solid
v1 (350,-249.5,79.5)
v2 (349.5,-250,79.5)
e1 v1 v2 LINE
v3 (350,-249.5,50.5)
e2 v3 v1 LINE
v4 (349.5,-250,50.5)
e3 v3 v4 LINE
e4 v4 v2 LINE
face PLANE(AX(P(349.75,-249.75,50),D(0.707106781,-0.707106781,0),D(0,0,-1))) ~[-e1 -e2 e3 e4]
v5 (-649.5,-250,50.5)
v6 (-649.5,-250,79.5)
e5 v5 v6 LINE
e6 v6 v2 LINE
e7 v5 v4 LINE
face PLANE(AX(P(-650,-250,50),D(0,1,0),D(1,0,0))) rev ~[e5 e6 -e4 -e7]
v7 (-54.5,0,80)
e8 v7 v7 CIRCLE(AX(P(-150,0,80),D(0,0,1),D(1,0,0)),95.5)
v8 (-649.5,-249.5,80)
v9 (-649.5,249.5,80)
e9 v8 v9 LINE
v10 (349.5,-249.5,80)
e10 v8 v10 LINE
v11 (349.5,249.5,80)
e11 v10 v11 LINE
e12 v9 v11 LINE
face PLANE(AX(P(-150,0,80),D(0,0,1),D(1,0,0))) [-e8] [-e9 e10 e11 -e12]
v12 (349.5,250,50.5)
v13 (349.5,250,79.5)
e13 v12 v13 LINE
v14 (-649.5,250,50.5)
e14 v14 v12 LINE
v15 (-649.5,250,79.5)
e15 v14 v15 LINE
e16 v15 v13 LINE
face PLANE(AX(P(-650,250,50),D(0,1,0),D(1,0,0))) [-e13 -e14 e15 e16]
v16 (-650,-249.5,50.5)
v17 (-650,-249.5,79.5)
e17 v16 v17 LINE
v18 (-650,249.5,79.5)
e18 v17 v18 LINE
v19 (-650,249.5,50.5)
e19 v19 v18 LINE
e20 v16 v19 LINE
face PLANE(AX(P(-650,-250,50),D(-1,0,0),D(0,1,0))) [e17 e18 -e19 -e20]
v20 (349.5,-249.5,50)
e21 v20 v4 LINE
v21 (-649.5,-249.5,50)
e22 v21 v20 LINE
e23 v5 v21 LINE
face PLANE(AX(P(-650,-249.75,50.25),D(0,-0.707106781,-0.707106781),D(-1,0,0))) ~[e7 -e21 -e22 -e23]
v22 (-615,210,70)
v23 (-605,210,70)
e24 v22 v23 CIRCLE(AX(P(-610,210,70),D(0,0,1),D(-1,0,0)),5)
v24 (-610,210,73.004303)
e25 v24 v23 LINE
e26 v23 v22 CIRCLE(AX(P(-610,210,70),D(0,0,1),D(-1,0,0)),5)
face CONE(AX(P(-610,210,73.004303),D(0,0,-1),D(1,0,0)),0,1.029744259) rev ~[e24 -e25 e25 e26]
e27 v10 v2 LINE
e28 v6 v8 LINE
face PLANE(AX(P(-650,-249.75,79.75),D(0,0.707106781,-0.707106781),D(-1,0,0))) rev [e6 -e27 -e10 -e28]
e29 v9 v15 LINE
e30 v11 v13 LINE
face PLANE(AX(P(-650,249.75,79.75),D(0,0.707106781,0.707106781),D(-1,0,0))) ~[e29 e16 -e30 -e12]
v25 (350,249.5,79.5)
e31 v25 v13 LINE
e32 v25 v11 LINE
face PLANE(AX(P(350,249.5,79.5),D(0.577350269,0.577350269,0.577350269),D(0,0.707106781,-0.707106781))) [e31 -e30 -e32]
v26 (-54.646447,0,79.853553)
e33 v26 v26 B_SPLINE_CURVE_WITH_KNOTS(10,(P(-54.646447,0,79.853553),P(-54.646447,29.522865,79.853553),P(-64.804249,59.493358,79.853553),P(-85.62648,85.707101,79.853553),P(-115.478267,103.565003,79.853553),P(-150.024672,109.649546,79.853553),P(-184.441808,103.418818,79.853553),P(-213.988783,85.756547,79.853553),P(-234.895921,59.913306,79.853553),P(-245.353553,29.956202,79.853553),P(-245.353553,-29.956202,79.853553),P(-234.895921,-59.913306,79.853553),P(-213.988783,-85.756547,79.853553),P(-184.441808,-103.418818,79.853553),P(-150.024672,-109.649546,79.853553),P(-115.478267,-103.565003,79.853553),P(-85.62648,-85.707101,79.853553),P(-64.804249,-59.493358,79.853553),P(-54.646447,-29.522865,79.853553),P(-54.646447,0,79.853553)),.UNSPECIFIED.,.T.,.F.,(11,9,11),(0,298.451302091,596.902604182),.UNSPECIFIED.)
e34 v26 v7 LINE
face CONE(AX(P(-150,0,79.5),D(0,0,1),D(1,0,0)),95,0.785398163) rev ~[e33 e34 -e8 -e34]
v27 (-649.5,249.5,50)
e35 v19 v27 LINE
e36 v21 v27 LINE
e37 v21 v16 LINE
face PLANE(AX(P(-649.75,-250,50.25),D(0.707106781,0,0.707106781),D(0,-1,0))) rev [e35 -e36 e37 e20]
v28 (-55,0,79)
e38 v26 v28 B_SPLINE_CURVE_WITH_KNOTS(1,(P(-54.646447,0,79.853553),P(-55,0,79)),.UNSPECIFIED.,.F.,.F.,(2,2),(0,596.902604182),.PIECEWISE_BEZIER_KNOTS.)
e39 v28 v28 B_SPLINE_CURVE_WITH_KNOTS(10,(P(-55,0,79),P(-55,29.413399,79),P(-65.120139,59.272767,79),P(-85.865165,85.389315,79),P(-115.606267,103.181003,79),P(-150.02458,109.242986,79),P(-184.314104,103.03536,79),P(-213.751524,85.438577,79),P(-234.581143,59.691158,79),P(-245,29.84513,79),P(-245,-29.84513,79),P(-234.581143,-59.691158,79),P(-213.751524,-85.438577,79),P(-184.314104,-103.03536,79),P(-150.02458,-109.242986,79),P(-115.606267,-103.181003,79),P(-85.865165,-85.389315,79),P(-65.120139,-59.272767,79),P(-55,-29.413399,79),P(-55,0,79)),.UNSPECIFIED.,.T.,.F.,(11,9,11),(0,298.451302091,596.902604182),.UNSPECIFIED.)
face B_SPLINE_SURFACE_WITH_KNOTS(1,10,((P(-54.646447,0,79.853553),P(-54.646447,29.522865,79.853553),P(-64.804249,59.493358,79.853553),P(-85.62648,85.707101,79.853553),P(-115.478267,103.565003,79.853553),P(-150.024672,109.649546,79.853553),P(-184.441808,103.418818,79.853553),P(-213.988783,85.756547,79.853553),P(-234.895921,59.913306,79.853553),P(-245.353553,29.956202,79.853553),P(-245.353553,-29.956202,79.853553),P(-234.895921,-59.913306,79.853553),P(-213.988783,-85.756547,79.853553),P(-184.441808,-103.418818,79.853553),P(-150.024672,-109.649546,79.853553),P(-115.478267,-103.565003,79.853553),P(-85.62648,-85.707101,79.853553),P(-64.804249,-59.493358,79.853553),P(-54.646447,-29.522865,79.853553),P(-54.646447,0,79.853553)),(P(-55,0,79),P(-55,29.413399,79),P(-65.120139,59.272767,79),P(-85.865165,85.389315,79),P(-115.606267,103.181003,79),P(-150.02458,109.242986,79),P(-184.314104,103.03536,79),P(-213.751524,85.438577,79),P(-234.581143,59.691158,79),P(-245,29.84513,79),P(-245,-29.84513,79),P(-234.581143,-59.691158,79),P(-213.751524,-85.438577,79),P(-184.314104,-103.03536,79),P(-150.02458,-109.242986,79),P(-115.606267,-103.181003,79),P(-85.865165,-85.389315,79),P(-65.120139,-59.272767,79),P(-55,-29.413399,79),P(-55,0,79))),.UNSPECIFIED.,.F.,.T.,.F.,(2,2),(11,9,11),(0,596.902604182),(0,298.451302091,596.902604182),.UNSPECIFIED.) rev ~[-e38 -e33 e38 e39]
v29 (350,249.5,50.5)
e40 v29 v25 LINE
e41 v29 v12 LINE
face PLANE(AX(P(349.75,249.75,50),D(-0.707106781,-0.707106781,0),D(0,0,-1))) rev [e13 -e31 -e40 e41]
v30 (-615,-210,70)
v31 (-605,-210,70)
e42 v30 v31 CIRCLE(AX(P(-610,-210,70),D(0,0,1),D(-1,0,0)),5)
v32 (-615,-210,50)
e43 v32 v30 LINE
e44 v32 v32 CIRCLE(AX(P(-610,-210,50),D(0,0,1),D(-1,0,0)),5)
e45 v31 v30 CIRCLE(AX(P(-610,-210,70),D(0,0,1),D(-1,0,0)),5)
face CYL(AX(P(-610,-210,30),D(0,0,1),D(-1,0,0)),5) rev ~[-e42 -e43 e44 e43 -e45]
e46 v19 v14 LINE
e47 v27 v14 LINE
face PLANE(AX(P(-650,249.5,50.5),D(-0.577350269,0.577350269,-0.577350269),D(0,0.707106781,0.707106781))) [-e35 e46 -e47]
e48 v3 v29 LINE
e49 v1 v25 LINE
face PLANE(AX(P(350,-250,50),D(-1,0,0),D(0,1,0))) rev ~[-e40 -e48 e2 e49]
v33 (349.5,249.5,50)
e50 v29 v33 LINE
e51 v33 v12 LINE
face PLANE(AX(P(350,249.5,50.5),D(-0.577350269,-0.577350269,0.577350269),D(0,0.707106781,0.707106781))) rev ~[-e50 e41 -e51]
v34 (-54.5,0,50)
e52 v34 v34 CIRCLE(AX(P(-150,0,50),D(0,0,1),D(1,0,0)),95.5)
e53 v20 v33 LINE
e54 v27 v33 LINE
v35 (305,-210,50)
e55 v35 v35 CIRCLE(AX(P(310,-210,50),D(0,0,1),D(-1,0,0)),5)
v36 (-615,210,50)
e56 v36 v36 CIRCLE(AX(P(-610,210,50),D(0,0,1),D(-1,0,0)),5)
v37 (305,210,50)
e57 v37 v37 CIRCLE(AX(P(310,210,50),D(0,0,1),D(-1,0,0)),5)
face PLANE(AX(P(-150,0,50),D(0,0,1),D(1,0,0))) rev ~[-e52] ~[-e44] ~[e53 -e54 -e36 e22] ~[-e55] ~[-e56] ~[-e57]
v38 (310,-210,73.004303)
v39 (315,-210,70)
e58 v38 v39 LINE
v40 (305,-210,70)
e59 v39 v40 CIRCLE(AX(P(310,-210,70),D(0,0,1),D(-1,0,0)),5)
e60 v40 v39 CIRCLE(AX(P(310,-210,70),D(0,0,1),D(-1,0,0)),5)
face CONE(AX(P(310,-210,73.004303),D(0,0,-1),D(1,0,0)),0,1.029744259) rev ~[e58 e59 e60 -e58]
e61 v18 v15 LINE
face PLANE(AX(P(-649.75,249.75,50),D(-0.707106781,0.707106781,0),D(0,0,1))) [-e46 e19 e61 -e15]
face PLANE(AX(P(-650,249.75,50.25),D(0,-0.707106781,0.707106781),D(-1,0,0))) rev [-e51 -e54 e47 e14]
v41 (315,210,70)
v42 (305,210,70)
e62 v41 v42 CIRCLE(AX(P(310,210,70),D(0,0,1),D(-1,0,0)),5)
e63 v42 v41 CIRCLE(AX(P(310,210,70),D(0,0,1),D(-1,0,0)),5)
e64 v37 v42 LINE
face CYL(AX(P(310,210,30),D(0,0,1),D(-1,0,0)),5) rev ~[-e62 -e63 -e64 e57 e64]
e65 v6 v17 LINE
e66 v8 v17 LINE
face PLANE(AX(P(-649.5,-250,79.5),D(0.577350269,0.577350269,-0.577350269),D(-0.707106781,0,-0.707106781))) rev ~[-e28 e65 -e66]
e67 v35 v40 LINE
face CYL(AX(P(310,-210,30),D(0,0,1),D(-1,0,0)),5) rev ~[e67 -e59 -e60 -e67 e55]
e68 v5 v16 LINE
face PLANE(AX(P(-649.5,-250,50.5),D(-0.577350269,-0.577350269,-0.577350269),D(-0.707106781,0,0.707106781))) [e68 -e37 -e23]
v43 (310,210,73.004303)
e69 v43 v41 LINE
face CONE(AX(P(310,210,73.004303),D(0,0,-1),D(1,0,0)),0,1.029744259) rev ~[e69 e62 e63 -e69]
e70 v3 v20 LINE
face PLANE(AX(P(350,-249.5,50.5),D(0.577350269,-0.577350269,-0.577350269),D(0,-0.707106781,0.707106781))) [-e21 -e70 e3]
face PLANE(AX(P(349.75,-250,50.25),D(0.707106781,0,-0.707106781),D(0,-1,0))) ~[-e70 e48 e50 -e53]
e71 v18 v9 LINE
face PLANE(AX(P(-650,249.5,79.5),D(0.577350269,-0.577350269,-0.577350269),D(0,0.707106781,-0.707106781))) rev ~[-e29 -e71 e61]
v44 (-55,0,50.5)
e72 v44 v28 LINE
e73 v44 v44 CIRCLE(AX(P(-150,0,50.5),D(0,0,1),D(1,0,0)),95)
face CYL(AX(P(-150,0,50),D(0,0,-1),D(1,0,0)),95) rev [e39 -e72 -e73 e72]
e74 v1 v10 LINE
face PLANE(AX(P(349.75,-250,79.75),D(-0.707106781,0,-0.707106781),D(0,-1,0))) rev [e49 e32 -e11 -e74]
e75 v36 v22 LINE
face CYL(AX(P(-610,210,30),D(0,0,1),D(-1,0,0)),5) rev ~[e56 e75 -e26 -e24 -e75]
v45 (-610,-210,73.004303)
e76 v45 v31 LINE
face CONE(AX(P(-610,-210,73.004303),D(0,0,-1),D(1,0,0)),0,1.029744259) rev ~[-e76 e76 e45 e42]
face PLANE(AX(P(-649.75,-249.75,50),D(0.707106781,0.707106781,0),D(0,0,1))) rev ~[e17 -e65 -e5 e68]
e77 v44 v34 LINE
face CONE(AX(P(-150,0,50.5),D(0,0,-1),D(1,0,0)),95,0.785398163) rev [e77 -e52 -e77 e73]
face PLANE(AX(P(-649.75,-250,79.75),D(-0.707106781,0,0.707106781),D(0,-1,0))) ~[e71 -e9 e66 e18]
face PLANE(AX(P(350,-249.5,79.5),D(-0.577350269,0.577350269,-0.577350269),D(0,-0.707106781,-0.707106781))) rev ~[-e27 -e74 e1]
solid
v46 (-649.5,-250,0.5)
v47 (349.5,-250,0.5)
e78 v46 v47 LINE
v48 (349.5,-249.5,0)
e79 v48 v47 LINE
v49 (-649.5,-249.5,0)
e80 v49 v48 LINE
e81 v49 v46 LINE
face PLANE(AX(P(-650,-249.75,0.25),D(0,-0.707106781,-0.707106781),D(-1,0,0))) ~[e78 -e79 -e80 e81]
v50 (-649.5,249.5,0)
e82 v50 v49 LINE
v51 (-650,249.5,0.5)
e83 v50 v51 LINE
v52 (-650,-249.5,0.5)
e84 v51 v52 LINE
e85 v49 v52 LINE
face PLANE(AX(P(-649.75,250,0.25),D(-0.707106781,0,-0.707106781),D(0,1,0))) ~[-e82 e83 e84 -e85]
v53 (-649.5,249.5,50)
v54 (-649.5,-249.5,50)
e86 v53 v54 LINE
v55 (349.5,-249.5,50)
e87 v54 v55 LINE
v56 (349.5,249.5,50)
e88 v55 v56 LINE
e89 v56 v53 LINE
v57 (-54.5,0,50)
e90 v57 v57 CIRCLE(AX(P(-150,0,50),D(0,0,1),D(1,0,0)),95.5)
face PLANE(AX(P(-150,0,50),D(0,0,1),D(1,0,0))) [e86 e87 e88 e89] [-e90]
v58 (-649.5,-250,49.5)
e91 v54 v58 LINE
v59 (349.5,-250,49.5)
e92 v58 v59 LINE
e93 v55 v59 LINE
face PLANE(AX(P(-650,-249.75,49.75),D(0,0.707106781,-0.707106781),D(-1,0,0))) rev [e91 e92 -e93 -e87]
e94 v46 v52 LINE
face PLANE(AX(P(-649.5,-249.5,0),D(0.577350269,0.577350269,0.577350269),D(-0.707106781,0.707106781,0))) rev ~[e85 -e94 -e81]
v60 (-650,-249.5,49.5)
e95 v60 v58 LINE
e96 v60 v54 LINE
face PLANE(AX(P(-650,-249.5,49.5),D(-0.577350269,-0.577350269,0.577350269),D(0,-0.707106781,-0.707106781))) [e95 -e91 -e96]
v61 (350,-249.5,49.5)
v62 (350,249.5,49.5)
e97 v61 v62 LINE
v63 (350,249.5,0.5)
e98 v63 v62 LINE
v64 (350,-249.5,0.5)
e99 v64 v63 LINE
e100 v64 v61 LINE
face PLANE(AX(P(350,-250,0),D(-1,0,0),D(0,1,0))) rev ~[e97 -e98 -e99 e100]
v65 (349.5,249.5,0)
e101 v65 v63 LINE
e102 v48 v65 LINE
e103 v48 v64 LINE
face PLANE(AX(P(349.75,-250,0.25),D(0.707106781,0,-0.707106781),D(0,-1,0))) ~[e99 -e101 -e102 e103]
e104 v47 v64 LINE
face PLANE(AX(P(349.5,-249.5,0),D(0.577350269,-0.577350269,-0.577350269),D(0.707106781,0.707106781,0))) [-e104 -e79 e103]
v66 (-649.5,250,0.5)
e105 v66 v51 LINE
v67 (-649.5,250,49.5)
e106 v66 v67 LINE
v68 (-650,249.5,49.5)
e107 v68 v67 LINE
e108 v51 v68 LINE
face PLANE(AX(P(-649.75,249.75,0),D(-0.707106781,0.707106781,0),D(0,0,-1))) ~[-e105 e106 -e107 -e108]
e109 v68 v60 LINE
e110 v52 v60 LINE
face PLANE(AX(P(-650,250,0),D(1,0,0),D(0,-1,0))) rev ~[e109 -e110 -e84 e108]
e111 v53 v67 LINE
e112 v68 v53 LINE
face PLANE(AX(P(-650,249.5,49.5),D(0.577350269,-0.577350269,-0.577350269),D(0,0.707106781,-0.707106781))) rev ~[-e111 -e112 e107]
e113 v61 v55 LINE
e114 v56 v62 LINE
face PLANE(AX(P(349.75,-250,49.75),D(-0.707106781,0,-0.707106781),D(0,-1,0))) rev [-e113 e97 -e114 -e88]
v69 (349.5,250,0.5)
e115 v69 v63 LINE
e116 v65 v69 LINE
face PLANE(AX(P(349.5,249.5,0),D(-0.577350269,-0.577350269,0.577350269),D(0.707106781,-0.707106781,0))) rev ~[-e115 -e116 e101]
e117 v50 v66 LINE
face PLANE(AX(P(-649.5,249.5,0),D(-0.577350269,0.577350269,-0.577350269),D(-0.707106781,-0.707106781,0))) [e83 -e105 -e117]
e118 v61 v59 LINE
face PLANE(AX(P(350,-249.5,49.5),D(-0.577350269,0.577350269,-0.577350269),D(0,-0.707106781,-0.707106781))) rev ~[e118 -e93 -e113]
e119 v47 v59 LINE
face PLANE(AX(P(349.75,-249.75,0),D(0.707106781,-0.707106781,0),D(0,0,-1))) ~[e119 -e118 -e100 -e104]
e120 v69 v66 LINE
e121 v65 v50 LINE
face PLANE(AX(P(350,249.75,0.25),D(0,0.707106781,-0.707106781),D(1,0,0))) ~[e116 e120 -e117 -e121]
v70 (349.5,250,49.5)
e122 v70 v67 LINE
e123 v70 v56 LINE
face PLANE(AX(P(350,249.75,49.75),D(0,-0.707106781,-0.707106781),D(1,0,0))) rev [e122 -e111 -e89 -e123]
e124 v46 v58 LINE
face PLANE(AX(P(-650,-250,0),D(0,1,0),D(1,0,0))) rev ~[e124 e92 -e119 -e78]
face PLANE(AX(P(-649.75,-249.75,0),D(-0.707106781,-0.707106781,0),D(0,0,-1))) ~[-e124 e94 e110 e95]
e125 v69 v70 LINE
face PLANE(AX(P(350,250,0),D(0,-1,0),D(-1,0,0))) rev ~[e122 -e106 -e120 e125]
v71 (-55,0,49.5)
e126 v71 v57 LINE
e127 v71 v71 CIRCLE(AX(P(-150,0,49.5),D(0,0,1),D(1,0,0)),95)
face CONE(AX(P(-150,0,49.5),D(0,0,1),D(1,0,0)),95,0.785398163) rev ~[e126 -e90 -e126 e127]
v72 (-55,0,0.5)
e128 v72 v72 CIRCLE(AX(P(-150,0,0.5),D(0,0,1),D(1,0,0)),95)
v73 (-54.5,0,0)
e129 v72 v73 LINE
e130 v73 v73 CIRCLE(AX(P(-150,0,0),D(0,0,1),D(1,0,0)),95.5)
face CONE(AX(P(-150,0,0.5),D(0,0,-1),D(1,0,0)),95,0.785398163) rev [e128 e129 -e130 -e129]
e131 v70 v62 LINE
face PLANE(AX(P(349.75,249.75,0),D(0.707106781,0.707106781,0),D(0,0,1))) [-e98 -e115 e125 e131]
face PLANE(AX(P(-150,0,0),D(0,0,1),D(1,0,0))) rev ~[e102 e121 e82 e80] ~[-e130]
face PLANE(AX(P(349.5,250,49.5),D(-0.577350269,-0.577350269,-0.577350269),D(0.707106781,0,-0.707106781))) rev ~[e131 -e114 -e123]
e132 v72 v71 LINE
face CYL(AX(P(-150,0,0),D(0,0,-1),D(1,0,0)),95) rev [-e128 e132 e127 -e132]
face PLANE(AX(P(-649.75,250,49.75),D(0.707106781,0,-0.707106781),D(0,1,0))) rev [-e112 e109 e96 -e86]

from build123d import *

# Parameters (mm, degrees)
F0_R      = 95
F1_DEPTH  = 50
F3_W      = 1000
F3_H      = 500
F3_W_2    = 920
F3_H_2    = 420
F3_R      = 95
F4_DEPTH  = 30
F5_SIZE   = 0.5
F6_D      = 10
F6_DEPTH  = 20
F6_TIP    = 3.0043030951
F7_SIZE   = 0.5
F7_2_SIZE = 0.5


# Not quite as in the source:
# - a feature names something its author has since deleted; it is built from what else it names


with BuildPart() as f1:
    # F0 (on Top) → F1 (new body)
    with BuildSketch(Plane.XY):
        with BuildLine():
            Line((330, 75), (350, 75))
            Line((350, 75), (350, 250))
            Line((350, 250), (-650, 250))
            Line((-650, 250), (-650, 75))
            Line((-650, 75), (-630, 75))
            ThreePointArc((-630, 75), (-622.9289321881, 72.0710678119), (-620, 65))
            Line((-620, 65), (-620, 0))
            Line((-620, 0), (-620, -65))
            ThreePointArc((-620, -65), (-622.9289321881, -72.0710678119), (-630, -75))
            Line((-630, -75), (-650, -75))
            Line((-650, -75), (-650, -250))
            Line((-650, -250), (350, -250))
            Line((350, -250), (350, -75))
            Line((350, -75), (330, -75))
            ThreePointArc((330, -75), (322.9289321881, -72.0710678119), (320, -65))
            Line((320, -65), (320, 65))
            ThreePointArc((320, 65), (322.9289321881, 72.0710678119), (330, 75))
        make_face()
        with Locations((-150, 0)):
            Circle(F0_R, mode=Mode.SUBTRACT)
        with BuildLine():
            Line((350, -75), (350, 75))
            Line((350, 75), (330, 75))
            ThreePointArc((330, 75), (322.9289321881, 72.0710678119), (320, 65))
            Line((320, 65), (320, -65))
            ThreePointArc((320, -65), (322.9289321881, -72.0710678119), (330, -75))
            Line((330, -75), (350, -75))
        make_face()
        with BuildLine():
            Line((-650, 0), (-650, -75))
            Line((-650, -75), (-630, -75))
            ThreePointArc((-630, -75), (-622.9289321881, -72.0710678119), (-620, -65))
            Line((-620, -65), (-620, 0))
            Line((-620, 0), (-650, 0))
        make_face()
        with BuildLine():
            Line((-630, 75), (-650, 75))
            Line((-650, 75), (-650, 0))
            Line((-650, 0), (-620, 0))
            Line((-620, 0), (-620, 65))
            ThreePointArc((-620, 65), (-622.9289321881, 72.0710678119), (-630, 75))
        make_face()
    extrude(amount=F1_DEPTH)

    # F7
    f7_edges = [f1.edges().sort_by_distance(p)[0] for p in [
        (-150, -250, 50),
        (350, 0, 50),
        (-150, 250, 50),
        (-650, 0, 50),
        (-245, 0, 50),
        (-650, -250, 25),
        (350, -250, 25),
        (-150, -250, 0),
        (350, 250, 25),
        (-650, 250, 25),
        (-150, 250, 0),
        (350, 0, 0),
        (-650, 0, 0),
        (-245, 0, 0),
    ]]
    chamfer(f7_edges, length=F7_SIZE)


with BuildPart() as f4:
    # F3 (on face) → F4 (new body)
    with BuildSketch(Plane.XY.offset(50)):
        with Locations((-150, 0)):
            Rectangle(F3_W, F3_H)
        with Locations((-150, 0)):
            Rectangle(F3_W_2, F3_H_2, mode=Mode.SUBTRACT)
        with Locations((-150, 0)):
            Rectangle(F3_W_2, F3_H_2)
        with Locations((-150, 0)):
            Circle(F3_R, mode=Mode.SUBTRACT)
    extrude(amount=F4_DEPTH)

    # F5
    f5_edges = [f4.edges().sort_by_distance(p)[0] for p in [
        (-150, 250, 80),
        (-650, 0, 80),
        (-150, -250, 80),
        (350, 0, 80),
        (-245, 0, 80),
        (-150, 250, 50),
        (-650, 0, 50),
        (-150, -250, 50),
        (350, 0, 50),
        (-245, 0, 50),
        (350, 250, 65),
        (-650, 250, 65),
        (-650, -250, 65),
        (350, -250, 65),
    ]]
    chamfer(f5_edges, length=F5_SIZE)

    # F6
    with Locations(Plane(origin=(0, 0, 50), x_dir=(1, 0, 0), z_dir=(0, 0, -1))):
        with Locations((-610, -210), (310, -210), (310, 210), (-610, 210)):
            Hole(F6_D / 2, depth=F6_DEPTH)
            with Locations((0, 0, -(F6_DEPTH + F6_TIP / 2))):  # 118° drill point
                Cone(0, F6_D / 2, F6_TIP, mode=Mode.SUBTRACT)

    # F7#2
    f7_2_edges = [f4.edges().sort_by_distance(p)[0] for p in [
        (-245, 0, 79.5),
    ]]
    chamfer(f7_2_edges, length=F7_2_SIZE)


solid = Compound([f1.part, f4.part])
